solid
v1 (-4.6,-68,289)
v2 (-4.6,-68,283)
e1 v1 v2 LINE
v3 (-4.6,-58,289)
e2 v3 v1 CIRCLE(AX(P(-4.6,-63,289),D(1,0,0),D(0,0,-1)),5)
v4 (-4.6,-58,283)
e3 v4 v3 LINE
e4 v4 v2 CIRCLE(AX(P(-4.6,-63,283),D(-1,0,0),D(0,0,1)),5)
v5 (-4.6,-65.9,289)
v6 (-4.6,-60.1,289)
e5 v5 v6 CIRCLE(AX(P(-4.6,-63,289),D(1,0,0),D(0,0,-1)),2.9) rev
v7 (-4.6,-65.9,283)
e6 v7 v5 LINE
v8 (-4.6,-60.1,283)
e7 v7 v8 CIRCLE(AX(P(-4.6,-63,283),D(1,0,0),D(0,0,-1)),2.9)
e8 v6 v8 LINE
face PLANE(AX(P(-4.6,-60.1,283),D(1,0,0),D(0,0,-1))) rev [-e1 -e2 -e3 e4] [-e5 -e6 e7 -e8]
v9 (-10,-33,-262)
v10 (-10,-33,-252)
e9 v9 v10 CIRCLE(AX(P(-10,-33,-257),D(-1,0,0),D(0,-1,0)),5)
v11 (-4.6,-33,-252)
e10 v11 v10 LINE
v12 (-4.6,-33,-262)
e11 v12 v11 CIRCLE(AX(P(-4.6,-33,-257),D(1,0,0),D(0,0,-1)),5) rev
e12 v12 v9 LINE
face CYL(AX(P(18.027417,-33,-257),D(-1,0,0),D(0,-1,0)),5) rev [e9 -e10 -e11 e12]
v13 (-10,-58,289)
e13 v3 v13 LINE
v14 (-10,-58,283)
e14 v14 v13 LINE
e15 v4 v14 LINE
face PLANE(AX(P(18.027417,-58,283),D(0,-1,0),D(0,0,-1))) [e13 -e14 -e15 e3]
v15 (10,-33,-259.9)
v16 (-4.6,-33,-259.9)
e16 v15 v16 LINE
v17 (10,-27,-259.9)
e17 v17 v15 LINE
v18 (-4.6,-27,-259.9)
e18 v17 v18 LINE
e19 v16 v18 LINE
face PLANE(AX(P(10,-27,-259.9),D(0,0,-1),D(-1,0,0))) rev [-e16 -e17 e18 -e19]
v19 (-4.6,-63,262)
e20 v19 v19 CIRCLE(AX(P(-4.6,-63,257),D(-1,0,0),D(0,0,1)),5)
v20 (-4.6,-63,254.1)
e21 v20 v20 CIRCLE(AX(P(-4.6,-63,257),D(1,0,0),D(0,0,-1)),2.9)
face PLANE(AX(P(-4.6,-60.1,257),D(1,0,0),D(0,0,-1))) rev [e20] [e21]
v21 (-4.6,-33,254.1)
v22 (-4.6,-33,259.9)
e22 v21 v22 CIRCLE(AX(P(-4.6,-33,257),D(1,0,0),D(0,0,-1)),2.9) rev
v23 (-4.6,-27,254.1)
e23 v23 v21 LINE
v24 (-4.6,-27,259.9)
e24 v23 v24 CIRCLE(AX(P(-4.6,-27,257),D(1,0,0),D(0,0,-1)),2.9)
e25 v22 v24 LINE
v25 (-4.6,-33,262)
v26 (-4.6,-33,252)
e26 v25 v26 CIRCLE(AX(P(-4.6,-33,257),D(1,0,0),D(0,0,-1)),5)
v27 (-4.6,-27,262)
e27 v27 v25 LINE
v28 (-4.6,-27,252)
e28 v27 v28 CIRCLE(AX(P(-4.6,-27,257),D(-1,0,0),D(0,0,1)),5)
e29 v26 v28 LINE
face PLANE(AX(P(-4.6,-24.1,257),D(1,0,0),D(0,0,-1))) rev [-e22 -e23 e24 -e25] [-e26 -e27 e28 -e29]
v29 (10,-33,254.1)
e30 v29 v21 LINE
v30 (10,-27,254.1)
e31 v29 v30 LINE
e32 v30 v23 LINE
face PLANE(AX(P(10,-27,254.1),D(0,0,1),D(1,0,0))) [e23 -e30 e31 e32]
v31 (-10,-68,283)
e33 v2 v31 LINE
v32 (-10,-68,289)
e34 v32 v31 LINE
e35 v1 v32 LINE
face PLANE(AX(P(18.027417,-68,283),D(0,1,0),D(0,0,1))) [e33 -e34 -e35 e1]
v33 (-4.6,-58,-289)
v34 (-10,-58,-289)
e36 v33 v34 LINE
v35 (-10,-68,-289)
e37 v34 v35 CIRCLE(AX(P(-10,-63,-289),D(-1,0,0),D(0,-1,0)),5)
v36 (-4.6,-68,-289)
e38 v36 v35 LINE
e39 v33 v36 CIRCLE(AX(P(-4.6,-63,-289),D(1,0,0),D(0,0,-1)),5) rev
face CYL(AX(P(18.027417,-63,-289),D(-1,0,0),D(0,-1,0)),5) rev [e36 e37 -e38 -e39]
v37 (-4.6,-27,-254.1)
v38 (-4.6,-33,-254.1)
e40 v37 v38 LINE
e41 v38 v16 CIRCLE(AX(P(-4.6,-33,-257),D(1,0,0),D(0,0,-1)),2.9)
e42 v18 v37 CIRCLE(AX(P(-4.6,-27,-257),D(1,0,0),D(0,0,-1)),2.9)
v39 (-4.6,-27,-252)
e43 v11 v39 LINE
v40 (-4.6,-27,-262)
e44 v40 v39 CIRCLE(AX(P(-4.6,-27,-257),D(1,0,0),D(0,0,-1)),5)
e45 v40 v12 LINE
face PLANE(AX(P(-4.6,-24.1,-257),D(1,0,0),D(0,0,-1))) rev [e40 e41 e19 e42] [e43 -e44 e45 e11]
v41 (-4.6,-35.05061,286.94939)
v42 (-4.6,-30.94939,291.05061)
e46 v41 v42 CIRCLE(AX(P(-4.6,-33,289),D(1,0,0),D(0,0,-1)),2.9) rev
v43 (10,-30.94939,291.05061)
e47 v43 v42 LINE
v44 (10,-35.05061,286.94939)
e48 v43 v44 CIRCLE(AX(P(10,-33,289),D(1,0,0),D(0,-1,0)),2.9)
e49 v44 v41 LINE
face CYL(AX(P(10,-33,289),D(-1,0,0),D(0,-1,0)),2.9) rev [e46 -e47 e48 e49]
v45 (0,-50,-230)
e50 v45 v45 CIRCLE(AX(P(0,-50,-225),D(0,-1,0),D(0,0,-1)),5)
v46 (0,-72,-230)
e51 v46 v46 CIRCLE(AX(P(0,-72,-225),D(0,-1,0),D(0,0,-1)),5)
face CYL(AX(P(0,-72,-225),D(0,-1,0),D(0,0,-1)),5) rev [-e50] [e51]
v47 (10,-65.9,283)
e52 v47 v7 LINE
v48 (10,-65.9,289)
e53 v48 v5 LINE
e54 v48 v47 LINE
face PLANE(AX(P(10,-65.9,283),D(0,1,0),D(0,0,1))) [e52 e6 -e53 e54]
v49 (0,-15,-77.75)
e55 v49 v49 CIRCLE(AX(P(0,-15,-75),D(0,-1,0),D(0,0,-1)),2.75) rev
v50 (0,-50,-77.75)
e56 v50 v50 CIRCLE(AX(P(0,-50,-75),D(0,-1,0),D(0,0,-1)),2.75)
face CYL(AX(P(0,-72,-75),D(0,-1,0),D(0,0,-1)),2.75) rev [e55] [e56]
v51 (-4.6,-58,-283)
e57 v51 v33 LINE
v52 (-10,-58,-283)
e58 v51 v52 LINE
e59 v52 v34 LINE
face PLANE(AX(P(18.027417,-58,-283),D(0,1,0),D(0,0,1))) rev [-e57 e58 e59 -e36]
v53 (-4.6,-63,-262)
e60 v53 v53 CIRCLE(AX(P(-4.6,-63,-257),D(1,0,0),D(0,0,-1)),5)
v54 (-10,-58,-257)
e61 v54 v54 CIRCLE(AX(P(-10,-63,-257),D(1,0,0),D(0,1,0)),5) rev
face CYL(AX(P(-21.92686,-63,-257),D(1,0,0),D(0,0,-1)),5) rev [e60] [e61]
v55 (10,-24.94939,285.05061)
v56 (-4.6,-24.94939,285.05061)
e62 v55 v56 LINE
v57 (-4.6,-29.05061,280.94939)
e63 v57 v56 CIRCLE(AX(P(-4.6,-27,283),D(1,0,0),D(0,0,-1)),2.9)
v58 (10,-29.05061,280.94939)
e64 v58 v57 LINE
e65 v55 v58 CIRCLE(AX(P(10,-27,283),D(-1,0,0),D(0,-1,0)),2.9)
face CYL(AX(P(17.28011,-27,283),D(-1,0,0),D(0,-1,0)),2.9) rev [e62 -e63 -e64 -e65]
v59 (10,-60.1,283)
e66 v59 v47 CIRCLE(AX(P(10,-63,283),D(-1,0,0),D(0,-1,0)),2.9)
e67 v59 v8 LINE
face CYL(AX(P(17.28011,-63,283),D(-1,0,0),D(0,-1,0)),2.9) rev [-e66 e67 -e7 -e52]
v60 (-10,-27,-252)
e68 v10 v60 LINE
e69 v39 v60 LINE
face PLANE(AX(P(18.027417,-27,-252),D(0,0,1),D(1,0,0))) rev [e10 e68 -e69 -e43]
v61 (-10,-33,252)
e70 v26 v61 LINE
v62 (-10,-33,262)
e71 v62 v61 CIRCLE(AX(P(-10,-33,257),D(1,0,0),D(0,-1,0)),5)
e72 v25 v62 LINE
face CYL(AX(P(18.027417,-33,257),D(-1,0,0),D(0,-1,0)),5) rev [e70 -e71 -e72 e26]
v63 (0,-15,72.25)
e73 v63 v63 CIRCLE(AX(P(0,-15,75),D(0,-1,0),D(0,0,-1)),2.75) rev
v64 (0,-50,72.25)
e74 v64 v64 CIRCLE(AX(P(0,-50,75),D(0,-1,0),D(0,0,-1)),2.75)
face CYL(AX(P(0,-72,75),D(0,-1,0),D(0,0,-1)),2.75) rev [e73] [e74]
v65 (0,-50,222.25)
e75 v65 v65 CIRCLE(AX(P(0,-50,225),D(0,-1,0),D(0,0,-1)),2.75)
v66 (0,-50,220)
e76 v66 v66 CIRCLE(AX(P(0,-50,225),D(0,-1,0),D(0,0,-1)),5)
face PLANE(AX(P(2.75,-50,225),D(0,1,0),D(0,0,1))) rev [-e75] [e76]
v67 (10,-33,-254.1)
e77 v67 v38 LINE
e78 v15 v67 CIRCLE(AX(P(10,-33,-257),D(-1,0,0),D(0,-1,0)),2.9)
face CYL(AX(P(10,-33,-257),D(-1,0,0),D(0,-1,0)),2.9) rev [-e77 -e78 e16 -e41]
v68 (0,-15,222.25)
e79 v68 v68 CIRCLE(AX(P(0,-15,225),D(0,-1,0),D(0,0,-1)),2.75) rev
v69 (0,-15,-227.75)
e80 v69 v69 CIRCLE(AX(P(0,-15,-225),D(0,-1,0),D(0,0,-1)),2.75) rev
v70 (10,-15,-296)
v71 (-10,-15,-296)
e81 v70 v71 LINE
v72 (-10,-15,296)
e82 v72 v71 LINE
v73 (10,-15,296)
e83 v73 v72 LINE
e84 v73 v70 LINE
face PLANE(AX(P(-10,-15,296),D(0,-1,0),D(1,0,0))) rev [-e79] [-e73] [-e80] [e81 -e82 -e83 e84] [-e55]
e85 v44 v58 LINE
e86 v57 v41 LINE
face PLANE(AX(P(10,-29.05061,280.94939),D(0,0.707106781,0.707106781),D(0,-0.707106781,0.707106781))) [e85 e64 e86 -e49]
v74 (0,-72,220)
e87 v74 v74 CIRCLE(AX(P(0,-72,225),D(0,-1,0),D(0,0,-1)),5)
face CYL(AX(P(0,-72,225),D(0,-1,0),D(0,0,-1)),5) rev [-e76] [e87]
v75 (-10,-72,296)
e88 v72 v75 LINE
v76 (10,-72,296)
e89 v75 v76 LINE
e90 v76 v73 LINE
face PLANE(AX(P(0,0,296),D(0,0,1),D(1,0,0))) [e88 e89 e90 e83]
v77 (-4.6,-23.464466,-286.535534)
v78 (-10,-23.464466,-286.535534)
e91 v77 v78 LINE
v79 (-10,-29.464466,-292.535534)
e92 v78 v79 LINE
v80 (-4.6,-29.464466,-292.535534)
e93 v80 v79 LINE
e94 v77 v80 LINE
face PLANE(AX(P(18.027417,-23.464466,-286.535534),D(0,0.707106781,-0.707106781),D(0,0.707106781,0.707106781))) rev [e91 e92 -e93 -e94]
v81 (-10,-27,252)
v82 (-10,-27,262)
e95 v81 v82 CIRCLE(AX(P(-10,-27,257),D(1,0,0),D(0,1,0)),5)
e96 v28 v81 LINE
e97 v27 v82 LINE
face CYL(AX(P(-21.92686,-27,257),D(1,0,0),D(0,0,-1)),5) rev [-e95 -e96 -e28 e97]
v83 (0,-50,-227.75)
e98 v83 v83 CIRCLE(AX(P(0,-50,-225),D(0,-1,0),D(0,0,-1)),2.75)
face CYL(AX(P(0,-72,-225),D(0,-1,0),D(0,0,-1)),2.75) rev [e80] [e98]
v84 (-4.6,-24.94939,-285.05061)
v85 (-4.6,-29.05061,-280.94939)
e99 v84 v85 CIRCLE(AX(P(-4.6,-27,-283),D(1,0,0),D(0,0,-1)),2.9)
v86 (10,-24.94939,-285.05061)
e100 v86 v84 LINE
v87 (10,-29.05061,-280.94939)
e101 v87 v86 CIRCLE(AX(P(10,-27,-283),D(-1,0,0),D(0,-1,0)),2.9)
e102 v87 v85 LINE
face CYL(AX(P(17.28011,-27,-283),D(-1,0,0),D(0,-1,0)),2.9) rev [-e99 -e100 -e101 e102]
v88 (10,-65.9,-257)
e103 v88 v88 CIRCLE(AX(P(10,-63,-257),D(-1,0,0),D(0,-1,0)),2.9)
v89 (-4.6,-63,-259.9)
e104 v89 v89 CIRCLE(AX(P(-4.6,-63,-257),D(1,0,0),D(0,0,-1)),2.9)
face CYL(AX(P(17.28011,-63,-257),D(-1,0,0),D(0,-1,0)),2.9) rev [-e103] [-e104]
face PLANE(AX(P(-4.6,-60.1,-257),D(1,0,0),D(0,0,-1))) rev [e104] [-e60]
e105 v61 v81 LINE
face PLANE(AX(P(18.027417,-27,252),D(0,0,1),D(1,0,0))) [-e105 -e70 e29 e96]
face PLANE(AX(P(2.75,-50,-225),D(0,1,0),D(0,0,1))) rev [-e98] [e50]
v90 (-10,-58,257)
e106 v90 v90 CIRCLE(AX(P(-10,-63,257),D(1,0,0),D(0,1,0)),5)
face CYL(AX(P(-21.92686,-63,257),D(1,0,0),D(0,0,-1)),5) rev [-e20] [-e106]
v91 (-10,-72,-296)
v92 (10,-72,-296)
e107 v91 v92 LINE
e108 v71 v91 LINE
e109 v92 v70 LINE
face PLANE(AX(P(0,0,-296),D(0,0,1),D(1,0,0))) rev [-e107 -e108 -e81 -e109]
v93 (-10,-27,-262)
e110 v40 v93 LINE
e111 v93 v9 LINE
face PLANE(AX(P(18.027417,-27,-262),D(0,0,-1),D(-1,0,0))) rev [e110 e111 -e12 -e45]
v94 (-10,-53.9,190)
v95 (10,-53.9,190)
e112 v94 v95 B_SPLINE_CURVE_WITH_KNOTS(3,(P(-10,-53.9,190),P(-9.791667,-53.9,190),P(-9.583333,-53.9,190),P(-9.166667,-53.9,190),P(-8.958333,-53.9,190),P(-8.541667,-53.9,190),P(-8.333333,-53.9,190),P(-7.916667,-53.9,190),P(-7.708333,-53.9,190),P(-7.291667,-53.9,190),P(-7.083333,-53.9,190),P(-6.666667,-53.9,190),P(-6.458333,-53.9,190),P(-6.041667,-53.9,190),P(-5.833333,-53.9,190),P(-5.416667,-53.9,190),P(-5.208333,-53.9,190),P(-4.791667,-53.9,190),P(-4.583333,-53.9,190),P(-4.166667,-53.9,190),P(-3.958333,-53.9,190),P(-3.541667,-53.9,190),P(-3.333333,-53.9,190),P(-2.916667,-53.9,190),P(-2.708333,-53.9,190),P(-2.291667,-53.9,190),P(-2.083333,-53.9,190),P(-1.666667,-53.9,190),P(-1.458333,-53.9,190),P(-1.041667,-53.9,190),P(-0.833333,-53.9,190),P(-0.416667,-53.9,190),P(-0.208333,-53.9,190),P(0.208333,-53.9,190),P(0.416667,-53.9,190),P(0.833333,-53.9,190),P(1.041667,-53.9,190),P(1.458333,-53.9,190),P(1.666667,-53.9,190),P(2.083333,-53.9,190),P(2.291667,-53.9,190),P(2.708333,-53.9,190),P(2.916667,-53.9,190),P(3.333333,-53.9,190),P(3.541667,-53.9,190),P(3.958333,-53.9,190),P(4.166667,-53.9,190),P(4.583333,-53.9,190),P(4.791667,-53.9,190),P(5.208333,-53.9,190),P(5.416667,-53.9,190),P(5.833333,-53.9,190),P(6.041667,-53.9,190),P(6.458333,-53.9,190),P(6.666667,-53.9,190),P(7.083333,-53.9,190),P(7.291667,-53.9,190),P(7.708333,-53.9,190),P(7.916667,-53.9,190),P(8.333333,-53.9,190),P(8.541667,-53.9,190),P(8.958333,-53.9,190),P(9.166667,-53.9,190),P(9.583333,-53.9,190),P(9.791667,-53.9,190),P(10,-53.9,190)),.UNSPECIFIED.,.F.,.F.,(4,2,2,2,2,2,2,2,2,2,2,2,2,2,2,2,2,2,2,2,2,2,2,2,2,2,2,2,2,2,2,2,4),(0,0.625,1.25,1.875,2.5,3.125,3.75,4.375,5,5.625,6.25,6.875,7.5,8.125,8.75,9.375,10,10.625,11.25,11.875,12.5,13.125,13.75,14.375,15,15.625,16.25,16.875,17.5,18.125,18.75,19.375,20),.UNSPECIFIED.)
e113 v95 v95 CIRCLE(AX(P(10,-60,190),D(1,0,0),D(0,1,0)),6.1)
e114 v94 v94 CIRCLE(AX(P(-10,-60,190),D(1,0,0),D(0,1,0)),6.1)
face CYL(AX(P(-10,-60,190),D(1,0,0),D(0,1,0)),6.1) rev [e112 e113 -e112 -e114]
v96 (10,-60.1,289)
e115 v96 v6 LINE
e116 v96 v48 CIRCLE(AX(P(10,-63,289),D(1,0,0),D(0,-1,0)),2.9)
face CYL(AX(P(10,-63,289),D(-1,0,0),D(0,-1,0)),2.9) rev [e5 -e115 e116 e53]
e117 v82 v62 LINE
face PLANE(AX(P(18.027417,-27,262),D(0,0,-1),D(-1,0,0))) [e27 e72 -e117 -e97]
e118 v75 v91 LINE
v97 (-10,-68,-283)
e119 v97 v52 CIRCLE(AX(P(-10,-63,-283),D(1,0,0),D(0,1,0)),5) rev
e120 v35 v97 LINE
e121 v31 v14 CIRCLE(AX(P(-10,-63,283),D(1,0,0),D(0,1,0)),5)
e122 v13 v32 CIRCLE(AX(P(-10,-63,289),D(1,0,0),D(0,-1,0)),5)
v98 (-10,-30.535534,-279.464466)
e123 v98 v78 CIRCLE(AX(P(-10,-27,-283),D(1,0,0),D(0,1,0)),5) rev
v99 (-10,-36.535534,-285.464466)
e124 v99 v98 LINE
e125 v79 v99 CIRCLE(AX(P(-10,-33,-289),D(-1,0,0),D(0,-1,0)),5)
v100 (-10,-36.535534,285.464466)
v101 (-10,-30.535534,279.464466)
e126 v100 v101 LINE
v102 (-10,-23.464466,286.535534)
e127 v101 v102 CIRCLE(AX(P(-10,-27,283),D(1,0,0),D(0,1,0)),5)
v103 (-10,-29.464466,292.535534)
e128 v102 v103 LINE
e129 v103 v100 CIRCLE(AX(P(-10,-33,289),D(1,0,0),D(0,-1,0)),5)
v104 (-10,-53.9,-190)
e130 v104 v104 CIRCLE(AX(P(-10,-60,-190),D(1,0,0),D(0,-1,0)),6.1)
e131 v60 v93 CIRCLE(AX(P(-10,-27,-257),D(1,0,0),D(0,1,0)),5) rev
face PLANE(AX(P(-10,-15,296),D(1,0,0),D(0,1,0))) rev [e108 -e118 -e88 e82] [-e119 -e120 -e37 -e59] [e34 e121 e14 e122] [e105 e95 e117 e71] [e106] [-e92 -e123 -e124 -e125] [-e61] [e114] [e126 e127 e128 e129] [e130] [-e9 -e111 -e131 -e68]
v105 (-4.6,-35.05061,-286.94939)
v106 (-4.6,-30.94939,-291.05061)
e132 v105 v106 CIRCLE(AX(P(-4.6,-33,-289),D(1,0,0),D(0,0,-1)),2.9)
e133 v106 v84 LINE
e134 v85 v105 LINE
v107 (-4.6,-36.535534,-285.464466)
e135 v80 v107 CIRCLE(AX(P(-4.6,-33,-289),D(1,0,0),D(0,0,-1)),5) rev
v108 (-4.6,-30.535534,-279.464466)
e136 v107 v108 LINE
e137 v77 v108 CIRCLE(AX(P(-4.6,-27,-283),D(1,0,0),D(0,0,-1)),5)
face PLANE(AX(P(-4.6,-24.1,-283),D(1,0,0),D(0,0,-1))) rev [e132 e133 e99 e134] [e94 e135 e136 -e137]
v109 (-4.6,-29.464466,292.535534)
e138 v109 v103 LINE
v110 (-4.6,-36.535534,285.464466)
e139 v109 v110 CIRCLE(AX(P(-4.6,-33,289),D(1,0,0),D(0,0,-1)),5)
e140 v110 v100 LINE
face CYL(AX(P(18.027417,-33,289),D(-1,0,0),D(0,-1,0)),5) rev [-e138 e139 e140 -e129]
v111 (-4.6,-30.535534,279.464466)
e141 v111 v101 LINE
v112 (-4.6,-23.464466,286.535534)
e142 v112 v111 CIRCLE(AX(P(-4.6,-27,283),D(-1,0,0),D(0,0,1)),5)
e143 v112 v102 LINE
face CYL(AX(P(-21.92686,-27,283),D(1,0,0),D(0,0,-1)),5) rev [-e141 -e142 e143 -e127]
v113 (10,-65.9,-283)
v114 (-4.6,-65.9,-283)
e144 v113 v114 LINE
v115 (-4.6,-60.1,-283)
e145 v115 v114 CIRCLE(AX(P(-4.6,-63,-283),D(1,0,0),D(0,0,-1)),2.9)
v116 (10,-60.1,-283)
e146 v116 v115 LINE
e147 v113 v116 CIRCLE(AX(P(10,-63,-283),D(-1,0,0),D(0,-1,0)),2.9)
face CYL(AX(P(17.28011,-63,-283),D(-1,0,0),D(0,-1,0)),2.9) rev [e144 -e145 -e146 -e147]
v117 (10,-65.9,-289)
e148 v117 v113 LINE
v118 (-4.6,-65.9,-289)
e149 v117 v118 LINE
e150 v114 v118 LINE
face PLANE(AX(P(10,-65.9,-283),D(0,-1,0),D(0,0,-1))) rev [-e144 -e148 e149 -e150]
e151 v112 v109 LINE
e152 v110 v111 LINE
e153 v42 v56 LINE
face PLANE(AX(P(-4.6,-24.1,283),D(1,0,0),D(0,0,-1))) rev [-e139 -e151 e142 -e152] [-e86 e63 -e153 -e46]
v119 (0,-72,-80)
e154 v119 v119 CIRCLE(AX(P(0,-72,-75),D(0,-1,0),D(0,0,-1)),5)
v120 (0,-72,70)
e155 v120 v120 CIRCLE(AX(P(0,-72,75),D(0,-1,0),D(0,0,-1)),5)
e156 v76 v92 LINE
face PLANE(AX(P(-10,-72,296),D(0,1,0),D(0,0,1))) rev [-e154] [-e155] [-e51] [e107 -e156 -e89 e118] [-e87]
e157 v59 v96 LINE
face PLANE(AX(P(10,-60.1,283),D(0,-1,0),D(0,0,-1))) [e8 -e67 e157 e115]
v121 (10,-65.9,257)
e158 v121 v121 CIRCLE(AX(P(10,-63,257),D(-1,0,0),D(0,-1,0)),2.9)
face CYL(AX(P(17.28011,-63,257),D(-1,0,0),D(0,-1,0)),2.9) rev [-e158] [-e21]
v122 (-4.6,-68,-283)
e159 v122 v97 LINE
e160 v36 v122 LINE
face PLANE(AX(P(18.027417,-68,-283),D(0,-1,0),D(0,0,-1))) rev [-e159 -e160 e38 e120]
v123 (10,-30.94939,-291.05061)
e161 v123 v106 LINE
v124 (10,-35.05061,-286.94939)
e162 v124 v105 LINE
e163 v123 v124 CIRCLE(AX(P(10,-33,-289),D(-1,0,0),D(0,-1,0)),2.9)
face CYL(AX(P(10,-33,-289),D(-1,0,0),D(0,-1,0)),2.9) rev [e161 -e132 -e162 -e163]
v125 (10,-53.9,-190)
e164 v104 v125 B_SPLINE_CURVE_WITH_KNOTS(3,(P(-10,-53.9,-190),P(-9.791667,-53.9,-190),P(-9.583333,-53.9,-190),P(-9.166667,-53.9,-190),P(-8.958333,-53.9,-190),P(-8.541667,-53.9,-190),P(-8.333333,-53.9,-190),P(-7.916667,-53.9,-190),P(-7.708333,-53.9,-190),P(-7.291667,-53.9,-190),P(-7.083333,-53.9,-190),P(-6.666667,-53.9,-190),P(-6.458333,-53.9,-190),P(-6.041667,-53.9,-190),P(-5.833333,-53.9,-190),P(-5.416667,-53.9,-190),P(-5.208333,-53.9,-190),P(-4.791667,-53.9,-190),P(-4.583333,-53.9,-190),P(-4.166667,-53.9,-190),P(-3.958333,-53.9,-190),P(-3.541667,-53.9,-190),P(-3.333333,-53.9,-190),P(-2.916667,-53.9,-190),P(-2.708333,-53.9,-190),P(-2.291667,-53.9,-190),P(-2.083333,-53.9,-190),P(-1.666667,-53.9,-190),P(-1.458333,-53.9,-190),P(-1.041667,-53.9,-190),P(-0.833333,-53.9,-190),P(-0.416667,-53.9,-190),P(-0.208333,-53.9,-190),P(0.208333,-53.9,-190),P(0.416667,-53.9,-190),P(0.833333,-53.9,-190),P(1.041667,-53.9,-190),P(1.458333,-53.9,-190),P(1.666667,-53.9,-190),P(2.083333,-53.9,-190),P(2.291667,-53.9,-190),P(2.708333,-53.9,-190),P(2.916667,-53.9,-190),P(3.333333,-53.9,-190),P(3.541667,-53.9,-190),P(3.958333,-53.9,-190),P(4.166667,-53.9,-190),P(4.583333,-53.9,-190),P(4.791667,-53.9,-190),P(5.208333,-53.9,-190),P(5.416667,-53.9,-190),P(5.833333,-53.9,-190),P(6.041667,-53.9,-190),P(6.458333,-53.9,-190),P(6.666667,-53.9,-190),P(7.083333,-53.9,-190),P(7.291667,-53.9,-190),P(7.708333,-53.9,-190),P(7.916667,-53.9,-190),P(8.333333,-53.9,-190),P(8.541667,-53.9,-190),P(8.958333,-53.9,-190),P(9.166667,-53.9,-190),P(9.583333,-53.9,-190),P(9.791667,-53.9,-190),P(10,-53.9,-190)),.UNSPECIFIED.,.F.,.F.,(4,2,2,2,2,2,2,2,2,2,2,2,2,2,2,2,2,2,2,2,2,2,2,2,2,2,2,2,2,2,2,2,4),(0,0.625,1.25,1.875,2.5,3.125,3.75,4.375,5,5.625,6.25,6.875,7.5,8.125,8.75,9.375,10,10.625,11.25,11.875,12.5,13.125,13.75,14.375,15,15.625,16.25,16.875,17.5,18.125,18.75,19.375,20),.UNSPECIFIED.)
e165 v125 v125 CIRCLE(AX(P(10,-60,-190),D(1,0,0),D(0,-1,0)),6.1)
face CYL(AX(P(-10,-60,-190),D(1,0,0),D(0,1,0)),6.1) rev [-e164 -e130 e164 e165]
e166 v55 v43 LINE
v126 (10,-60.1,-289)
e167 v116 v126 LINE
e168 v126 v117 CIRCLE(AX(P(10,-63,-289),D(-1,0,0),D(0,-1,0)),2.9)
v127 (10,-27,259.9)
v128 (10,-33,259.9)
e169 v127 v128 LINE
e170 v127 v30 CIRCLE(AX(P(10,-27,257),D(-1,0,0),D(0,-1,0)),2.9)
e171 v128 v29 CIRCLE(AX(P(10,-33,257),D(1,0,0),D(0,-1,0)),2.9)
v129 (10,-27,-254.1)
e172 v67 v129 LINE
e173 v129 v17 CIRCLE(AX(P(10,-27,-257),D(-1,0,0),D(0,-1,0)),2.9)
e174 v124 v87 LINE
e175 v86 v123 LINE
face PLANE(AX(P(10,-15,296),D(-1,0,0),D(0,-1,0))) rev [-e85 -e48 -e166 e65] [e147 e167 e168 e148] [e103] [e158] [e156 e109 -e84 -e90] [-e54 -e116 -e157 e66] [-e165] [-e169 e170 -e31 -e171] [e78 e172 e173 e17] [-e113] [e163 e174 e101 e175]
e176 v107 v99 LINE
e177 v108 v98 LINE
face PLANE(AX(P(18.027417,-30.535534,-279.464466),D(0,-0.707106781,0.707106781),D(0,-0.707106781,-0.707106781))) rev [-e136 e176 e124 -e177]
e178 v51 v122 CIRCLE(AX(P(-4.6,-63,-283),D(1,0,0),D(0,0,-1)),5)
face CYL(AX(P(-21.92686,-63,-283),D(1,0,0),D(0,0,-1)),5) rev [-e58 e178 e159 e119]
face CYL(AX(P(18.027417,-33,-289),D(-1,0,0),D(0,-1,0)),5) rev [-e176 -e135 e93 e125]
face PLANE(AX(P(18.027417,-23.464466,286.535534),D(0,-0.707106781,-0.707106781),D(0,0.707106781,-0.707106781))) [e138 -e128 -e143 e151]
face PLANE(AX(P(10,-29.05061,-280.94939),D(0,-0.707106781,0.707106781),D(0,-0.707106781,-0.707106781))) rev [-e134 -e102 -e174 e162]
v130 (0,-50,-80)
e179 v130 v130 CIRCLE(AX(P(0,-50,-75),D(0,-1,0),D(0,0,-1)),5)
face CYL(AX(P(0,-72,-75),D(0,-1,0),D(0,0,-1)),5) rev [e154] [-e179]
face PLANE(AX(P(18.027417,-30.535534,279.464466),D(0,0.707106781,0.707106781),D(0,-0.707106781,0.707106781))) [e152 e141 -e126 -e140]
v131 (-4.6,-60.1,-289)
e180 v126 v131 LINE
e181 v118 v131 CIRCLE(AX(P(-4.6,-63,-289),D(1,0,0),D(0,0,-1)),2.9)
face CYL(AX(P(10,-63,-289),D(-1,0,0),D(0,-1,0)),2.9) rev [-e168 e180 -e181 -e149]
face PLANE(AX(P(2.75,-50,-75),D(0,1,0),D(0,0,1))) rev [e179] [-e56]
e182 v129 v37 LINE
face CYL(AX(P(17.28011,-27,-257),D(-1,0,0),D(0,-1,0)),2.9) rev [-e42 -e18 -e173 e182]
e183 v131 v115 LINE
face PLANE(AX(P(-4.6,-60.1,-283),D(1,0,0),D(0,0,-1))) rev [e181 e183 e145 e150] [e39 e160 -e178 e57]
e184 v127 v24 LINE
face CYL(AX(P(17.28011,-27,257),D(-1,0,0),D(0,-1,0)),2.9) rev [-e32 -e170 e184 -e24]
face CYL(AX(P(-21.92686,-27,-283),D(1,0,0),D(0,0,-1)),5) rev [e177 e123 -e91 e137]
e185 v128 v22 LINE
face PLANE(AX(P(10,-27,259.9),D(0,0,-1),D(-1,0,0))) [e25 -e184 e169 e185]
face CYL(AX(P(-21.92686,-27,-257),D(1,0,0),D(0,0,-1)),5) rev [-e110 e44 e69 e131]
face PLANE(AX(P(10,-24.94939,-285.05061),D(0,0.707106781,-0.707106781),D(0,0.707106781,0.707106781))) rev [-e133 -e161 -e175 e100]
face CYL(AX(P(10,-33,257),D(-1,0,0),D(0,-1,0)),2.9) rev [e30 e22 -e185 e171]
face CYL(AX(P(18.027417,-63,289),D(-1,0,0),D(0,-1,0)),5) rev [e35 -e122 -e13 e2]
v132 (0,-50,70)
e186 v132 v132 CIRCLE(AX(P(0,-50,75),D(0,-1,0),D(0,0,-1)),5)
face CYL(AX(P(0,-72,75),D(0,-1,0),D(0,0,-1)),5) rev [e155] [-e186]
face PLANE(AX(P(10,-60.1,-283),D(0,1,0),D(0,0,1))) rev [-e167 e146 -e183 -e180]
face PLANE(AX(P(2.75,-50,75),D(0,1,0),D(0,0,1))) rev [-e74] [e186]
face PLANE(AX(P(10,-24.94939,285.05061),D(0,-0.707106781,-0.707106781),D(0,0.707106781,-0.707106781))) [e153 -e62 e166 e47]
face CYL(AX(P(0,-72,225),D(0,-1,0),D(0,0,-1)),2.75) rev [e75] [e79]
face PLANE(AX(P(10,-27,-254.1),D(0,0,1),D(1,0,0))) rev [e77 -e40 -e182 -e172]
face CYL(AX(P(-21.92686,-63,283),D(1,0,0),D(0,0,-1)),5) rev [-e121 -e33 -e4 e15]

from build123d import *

# Parameters (mm, degrees)
CUT_EXTRUDE1_START       = 5
CUT_EXTRUDE1_OUTLINE_W   = 57
CUT_EXTRUDE1_OUTLINE_H   = 592
CUT_EXTRUDE1_DEPTH       = 5
CUT_EXTRUDE1_START_2     = -10
CUT_EXTRUDE1_2_OUTLINE_W = 57
CUT_EXTRUDE1_2_OUTLINE_H = 592
CUT_EXTRUDE1_2_DEPTH     = 4.9999999
CUT_EXTRUDE1_START_3     = -4.6
CUT_EXTRUDE1_3_DEPTH     = 14.6
CUT_EXTRUDE1_START_4     = -296
CUT_EXTRUDE1_4_OUTLINE_W = 10.0000001
CUT_EXTRUDE1_4_OUTLINE_H = 57
CUT_EXTRUDE1_4_DEPTH     = 592
CUT_EXTRUDE1_START_5     = -73
CUT_EXTRUDE1_5_OUTLINE_R = 5
CUT_EXTRUDE1_5_DEPTH     = 23
CUT_EXTRUDE1_START_6     = -50
CUT_EXTRUDE1_6_OUTLINE_R = 2.75
CUT_EXTRUDE1_6_DEPTH     = 36
CUT_EXTRUDE1_START_7     = -5.0000001
CUT_EXTRUDE1_7_DEPTH     = 10.0000001
CUT_EXTRUDE1_8_DEPTH     = 0.4000001
BOSS_EXTRUDE1_START      = -5.4
BOSS_EXTRUDE1_DEPTH      = 14.6
BOSS_EXTRUDE2_START      = 5.4
BOSS_EXTRUDE2_DEPTH      = 5.4
CUT_EXTRUDE2_DEPTH       = 5.4
CUT_EXTRUDE3_DEPTH       = 306.286750449
SKETCH6_R                = 6.1
CUT_EXTRUDE4_DEPTH       = 306.286750449


with BuildPart() as part:
    # Cut-Extrude1: read off the stored shape, not the designer's step
    # Cut-Extrude1 outline → Cut-Extrude1 (new body)
    with BuildSketch(Plane.YZ.offset(CUT_EXTRUDE1_START)):
        with Locations((-43.5, 0)):
            Rectangle(CUT_EXTRUDE1_OUTLINE_W, CUT_EXTRUDE1_OUTLINE_H)
        with BuildLine():
            Line((-61.5, -285.9), (-64.5, -285.9))
            ThreePointArc((-64.5, -285.9), (-67.4, -283), (-64.5, -280.1))
            Line((-64.5, -280.1), (-61.5, -280.1))
            ThreePointArc((-61.5, -280.1), (-58.6, -283), (-61.5, -285.9))
        make_face(mode=Mode.SUBTRACT)
        with BuildLine():
            Line((-61.5, -259.9), (-64.5, -259.9))
            ThreePointArc((-64.5, -259.9), (-67.4, -257), (-64.5, -254.1))
            Line((-64.5, -254.1), (-61.5, -254.1))
            ThreePointArc((-61.5, -254.1), (-58.6, -257), (-61.5, -259.9))
        make_face(mode=Mode.SUBTRACT)
        with BuildLine():
            Line((-28.5, -280.1), (-25.5, -280.1))
            ThreePointArc((-25.5, -280.1), (-22.6, -283), (-25.5, -285.9))
            Line((-25.5, -285.9), (-28.5, -285.9))
            ThreePointArc((-28.5, -285.9), (-31.4, -283), (-28.5, -280.1))
        make_face(mode=Mode.SUBTRACT)
        with BuildLine():
            Line((-28.5, -254.1), (-25.5, -254.1))
            ThreePointArc((-25.5, -254.1), (-22.6, -257), (-25.5, -259.9))
            Line((-25.5, -259.9), (-28.5, -259.9))
            ThreePointArc((-28.5, -259.9), (-31.4, -257), (-28.5, -254.1))
        make_face(mode=Mode.SUBTRACT)
        with BuildLine():
            Line((-61.5, 254.1), (-64.5, 254.1))
            ThreePointArc((-64.5, 254.1), (-67.4, 257), (-64.5, 259.9))
            Line((-64.5, 259.9), (-61.5, 259.9))
            ThreePointArc((-61.5, 259.9), (-58.6, 257), (-61.5, 254.1))
        make_face(mode=Mode.SUBTRACT)
        with BuildLine():
            Line((-61.5, 280.1), (-64.5, 280.1))
            ThreePointArc((-64.5, 280.1), (-67.4, 283), (-64.5, 285.9))
            Line((-64.5, 285.9), (-61.5, 285.9))
            ThreePointArc((-61.5, 285.9), (-58.6, 283), (-61.5, 280.1))
        make_face(mode=Mode.SUBTRACT)
        with BuildLine():
            Line((-28.5, 259.9), (-25.5, 259.9))
            ThreePointArc((-25.5, 259.9), (-22.6, 257), (-25.5, 254.1))
            Line((-25.5, 254.1), (-28.5, 254.1))
            ThreePointArc((-28.5, 254.1), (-31.4, 257), (-28.5, 259.9))
        make_face(mode=Mode.SUBTRACT)
        with BuildLine():
            Line((-28.5, 285.9), (-25.5, 285.9))
            ThreePointArc((-25.5, 285.9), (-22.6, 283), (-25.5, 280.1))
            Line((-25.5, 280.1), (-28.5, 280.1))
            ThreePointArc((-28.5, 280.1), (-31.4, 283), (-28.5, 285.9))
        make_face(mode=Mode.SUBTRACT)
    extrude(amount=CUT_EXTRUDE1_DEPTH)

    # Cut-Extrude1 3 outline → Cut-Extrude1 3 (add)
    # profile 1 of 8: a face of its own
    with BuildSketch(Plane.YZ.offset(CUT_EXTRUDE1_START_3)):
        with BuildLine():
            Line((-25.5, 288), (-28.5, 288))
            ThreePointArc((-28.5, 288), (-33.5, 283), (-28.5, 278))
            Line((-28.5, 278), (-25.5, 278))
            ThreePointArc((-25.5, 278), (-20.5, 283), (-25.5, 288))
        make_face()
        with BuildLine():
            Line((-28.5, 285.9), (-25.5, 285.9))
            ThreePointArc((-25.5, 285.9), (-22.6, 283), (-25.5, 280.1))
            Line((-25.5, 280.1), (-28.5, 280.1))
            ThreePointArc((-28.5, 280.1), (-31.4, 283), (-28.5, 285.9))
        make_face(mode=Mode.SUBTRACT)
    # profile 2 of 8: a face of its own
    with BuildSketch(Plane.YZ.offset(CUT_EXTRUDE1_START_3)):
        with BuildLine():
            Line((-25.5, 262), (-28.5, 262))
            ThreePointArc((-28.5, 262), (-33.5, 257), (-28.5, 252))
            Line((-28.5, 252), (-25.5, 252))
            ThreePointArc((-25.5, 252), (-20.5, 257), (-25.5, 262))
        make_face()
        with BuildLine():
            Line((-28.5, 259.9), (-25.5, 259.9))
            ThreePointArc((-25.5, 259.9), (-22.6, 257), (-25.5, 254.1))
            Line((-25.5, 254.1), (-28.5, 254.1))
            ThreePointArc((-28.5, 254.1), (-31.4, 257), (-28.5, 259.9))
        make_face(mode=Mode.SUBTRACT)
    # profile 3 of 8: a face of its own
    with BuildSketch(Plane.YZ.offset(CUT_EXTRUDE1_START_3)):
        with BuildLine():
            Line((-64.5, 252), (-61.5, 252))
            ThreePointArc((-61.5, 252), (-56.5, 257), (-61.5, 262))
            Line((-61.5, 262), (-64.5, 262))
            ThreePointArc((-64.5, 262), (-69.5, 257), (-64.5, 252))
        make_face()
        with BuildLine():
            Line((-61.5, 254.1), (-64.5, 254.1))
            ThreePointArc((-64.5, 254.1), (-67.4, 257), (-64.5, 259.9))
            Line((-64.5, 259.9), (-61.5, 259.9))
            ThreePointArc((-61.5, 259.9), (-58.6, 257), (-61.5, 254.1))
        make_face(mode=Mode.SUBTRACT)
    # profile 4 of 8: a face of its own
    with BuildSketch(Plane.YZ.offset(CUT_EXTRUDE1_START_3)):
        with BuildLine():
            Line((-64.5, 278), (-61.5, 278))
            ThreePointArc((-61.5, 278), (-56.5, 283), (-61.5, 288))
            Line((-61.5, 288), (-64.5, 288))
            ThreePointArc((-64.5, 288), (-69.5, 283), (-64.5, 278))
        make_face()
        with BuildLine():
            Line((-61.5, 280.1), (-64.5, 280.1))
            ThreePointArc((-64.5, 280.1), (-67.4, 283), (-64.5, 285.9))
            Line((-64.5, 285.9), (-61.5, 285.9))
            ThreePointArc((-61.5, 285.9), (-58.6, 283), (-61.5, 280.1))
        make_face(mode=Mode.SUBTRACT)
    # profile 5 of 8: a face of its own
    with BuildSketch(Plane.YZ.offset(CUT_EXTRUDE1_START_3)):
        with BuildLine():
            Line((-64.5, -288), (-61.5, -288))
            ThreePointArc((-61.5, -288), (-56.5, -283), (-61.5, -278))
            Line((-61.5, -278), (-64.5, -278))
            ThreePointArc((-64.5, -278), (-69.5, -283), (-64.5, -288))
        make_face()
        with BuildLine():
            Line((-61.5, -285.9), (-64.5, -285.9))
            ThreePointArc((-64.5, -285.9), (-67.4, -283), (-64.5, -280.1))
            Line((-64.5, -280.1), (-61.5, -280.1))
            ThreePointArc((-61.5, -280.1), (-58.6, -283), (-61.5, -285.9))
        make_face(mode=Mode.SUBTRACT)
    # profile 6 of 8: a face of its own
    with BuildSketch(Plane.YZ.offset(CUT_EXTRUDE1_START_3)):
        with BuildLine():
            Line((-64.5, -262), (-61.5, -262))
            ThreePointArc((-61.5, -262), (-56.5, -257), (-61.5, -252))
            Line((-61.5, -252), (-64.5, -252))
            ThreePointArc((-64.5, -252), (-69.5, -257), (-64.5, -262))
        make_face()
        with BuildLine():
            Line((-61.5, -259.9), (-64.5, -259.9))
            ThreePointArc((-64.5, -259.9), (-67.4, -257), (-64.5, -254.1))
            Line((-64.5, -254.1), (-61.5, -254.1))
            ThreePointArc((-61.5, -254.1), (-58.6, -257), (-61.5, -259.9))
        make_face(mode=Mode.SUBTRACT)
    # profile 7 of 8: a face of its own
    with BuildSketch(Plane.YZ.offset(CUT_EXTRUDE1_START_3)):
        with BuildLine():
            Line((-25.5, -252), (-28.5, -252))
            ThreePointArc((-28.5, -252), (-33.5, -257), (-28.5, -262))
            Line((-28.5, -262), (-25.5, -262))
            ThreePointArc((-25.5, -262), (-20.5, -257), (-25.5, -252))
        make_face()
        with BuildLine():
            Line((-28.5, -254.1), (-25.5, -254.1))
            ThreePointArc((-25.5, -254.1), (-22.6, -257), (-25.5, -259.9))
            Line((-25.5, -259.9), (-28.5, -259.9))
            ThreePointArc((-28.5, -259.9), (-31.4, -257), (-28.5, -254.1))
        make_face(mode=Mode.SUBTRACT)
    # profile 8 of 8: a face of its own
    with BuildSketch(Plane.YZ.offset(CUT_EXTRUDE1_START_3)):
        with BuildLine():
            Line((-25.5, -278), (-28.5, -278))
            ThreePointArc((-28.5, -278), (-33.5, -283), (-28.5, -288))
            Line((-28.5, -288), (-25.5, -288))
            ThreePointArc((-25.5, -288), (-20.5, -283), (-25.5, -278))
        make_face()
        with BuildLine():
            Line((-28.5, -280.1), (-25.5, -280.1))
            ThreePointArc((-25.5, -280.1), (-22.6, -283), (-25.5, -285.9))
            Line((-25.5, -285.9), (-28.5, -285.9))
            ThreePointArc((-28.5, -285.9), (-31.4, -283), (-28.5, -280.1))
        make_face(mode=Mode.SUBTRACT)
    extrude(amount=CUT_EXTRUDE1_3_DEPTH)



with BuildPart() as body_2:
    # Cut-Extrude1 2 outline → Cut-Extrude1 2 (new body)
    with BuildSketch(Plane.YZ.offset(CUT_EXTRUDE1_START_2)):
        with Locations((-43.5, 0)):
            Rectangle(CUT_EXTRUDE1_2_OUTLINE_W, CUT_EXTRUDE1_2_OUTLINE_H)
        with BuildLine():
            ThreePointArc((-61.5, -278), (-56.5, -283), (-61.5, -288))
            Line((-61.5, -288), (-64.5, -288))
            ThreePointArc((-64.5, -288), (-69.5, -283), (-64.5, -278))
            Line((-64.5, -278), (-61.5, -278))
        make_face(mode=Mode.SUBTRACT)
        with BuildLine():
            ThreePointArc((-61.5, -252), (-56.5, -257), (-61.5, -262))
            Line((-61.5, -262), (-64.5, -262))
            ThreePointArc((-64.5, -262), (-69.5, -257), (-64.5, -252))
            Line((-64.5, -252), (-61.5, -252))
        make_face(mode=Mode.SUBTRACT)
        with BuildLine():
            ThreePointArc((-28.5, -288), (-33.5, -283), (-28.5, -278))
            Line((-28.5, -278), (-25.5, -278))
            ThreePointArc((-25.5, -278), (-20.5, -283), (-25.5, -288))
            Line((-25.5, -288), (-28.5, -288))
        make_face(mode=Mode.SUBTRACT)
        with BuildLine():
            ThreePointArc((-28.5, -262), (-33.5, -257), (-28.5, -252))
            Line((-28.5, -252), (-25.5, -252))
            ThreePointArc((-25.5, -252), (-20.5, -257), (-25.5, -262))
            Line((-25.5, -262), (-28.5, -262))
        make_face(mode=Mode.SUBTRACT)
        with BuildLine():
            ThreePointArc((-61.5, 262), (-56.5, 257), (-61.5, 252))
            Line((-61.5, 252), (-64.5, 252))
            ThreePointArc((-64.5, 252), (-69.5, 257), (-64.5, 262))
            Line((-64.5, 262), (-61.5, 262))
        make_face(mode=Mode.SUBTRACT)
        with BuildLine():
            ThreePointArc((-61.5, 288), (-56.5, 283), (-61.5, 278))
            Line((-61.5, 278), (-64.5, 278))
            ThreePointArc((-64.5, 278), (-69.5, 283), (-64.5, 288))
            Line((-64.5, 288), (-61.5, 288))
        make_face(mode=Mode.SUBTRACT)
        with BuildLine():
            ThreePointArc((-28.5, 252), (-33.5, 257), (-28.5, 262))
            Line((-28.5, 262), (-25.5, 262))
            ThreePointArc((-25.5, 262), (-20.5, 257), (-25.5, 252))
            Line((-25.5, 252), (-28.5, 252))
        make_face(mode=Mode.SUBTRACT)
        with BuildLine():
            ThreePointArc((-28.5, 278), (-33.5, 283), (-28.5, 288))
            Line((-28.5, 288), (-25.5, 288))
            ThreePointArc((-25.5, 288), (-20.5, 283), (-25.5, 278))
            Line((-25.5, 278), (-28.5, 278))
        make_face(mode=Mode.SUBTRACT)
    extrude(amount=CUT_EXTRUDE1_2_DEPTH)


with BuildPart() as part_1:
    add(part.part)

    add(body_2.part)  # Cut-Extrude1 4 merges body 2
    # Cut-Extrude1 4 outline → Cut-Extrude1 4 (add)
    with BuildSketch(Plane.XY.offset(CUT_EXTRUDE1_START_4)):
        with Locations((-5e-08, -43.5)):
            Rectangle(CUT_EXTRUDE1_4_OUTLINE_W, CUT_EXTRUDE1_4_OUTLINE_H)
    extrude(amount=CUT_EXTRUDE1_4_DEPTH)

    # Cut-Extrude1 5 outline → Cut-Extrude1 5 (cut)
    with BuildSketch(Plane(origin=(0, 0, 0), x_dir=(1, 0, 0), z_dir=(0, 1, 0)).offset(CUT_EXTRUDE1_START_5)):
        with Locations((0, -225)):
            Circle(CUT_EXTRUDE1_5_OUTLINE_R)
        with Locations((0, -75)):
            Circle(CUT_EXTRUDE1_5_OUTLINE_R)
        with Locations((0, 75)):
            Circle(CUT_EXTRUDE1_5_OUTLINE_R)
        with Locations((0, 225)):
            Circle(CUT_EXTRUDE1_5_OUTLINE_R)
    extrude(amount=CUT_EXTRUDE1_5_DEPTH, mode=Mode.SUBTRACT)

    # Cut-Extrude1 6 outline → Cut-Extrude1 6 (cut)
    with BuildSketch(Plane(origin=(0, 0, 0), x_dir=(1, 0, 0), z_dir=(0, 1, 0)).offset(CUT_EXTRUDE1_START_6)):
        with Locations((0, -225)):
            Circle(CUT_EXTRUDE1_6_OUTLINE_R)
        with Locations((0, -75)):
            Circle(CUT_EXTRUDE1_6_OUTLINE_R)
        with Locations((0, 75)):
            Circle(CUT_EXTRUDE1_6_OUTLINE_R)
        with Locations((0, 225)):
            Circle(CUT_EXTRUDE1_6_OUTLINE_R)
    extrude(amount=CUT_EXTRUDE1_6_DEPTH, mode=Mode.SUBTRACT)

    # Cut-Extrude1 7 outline → Cut-Extrude1 7 (cut)
    with BuildSketch(Plane.YZ.offset(CUT_EXTRUDE1_START_7)):
        with BuildLine():
            ThreePointArc((-25.5, 280.1), (-22.6, 283), (-25.5, 285.9))
            Line((-25.5, 285.9), (-28.5, 285.9))
            ThreePointArc((-28.5, 285.9), (-31.4, 283), (-28.5, 280.1))
            Line((-28.5, 280.1), (-25.5, 280.1))
        make_face()
        with BuildLine():
            ThreePointArc((-61.5, 280.1), (-58.6, 283), (-61.5, 285.9))
            Line((-61.5, 285.9), (-64.5, 285.9))
            ThreePointArc((-64.5, 285.9), (-67.4, 283), (-64.5, 280.1))
            Line((-64.5, 280.1), (-61.5, 280.1))
        make_face()
        with BuildLine():
            ThreePointArc((-25.5, 254.1), (-22.6, 257), (-25.5, 259.9))
            Line((-25.5, 259.9), (-28.5, 259.9))
            ThreePointArc((-28.5, 259.9), (-31.4, 257), (-28.5, 254.1))
            Line((-28.5, 254.1), (-25.5, 254.1))
        make_face()
        with BuildLine():
            ThreePointArc((-61.5, 254.1), (-58.6, 257), (-61.5, 259.9))
            Line((-61.5, 259.9), (-64.5, 259.9))
            ThreePointArc((-64.5, 259.9), (-67.4, 257), (-64.5, 254.1))
            Line((-64.5, 254.1), (-61.5, 254.1))
        make_face()
        with BuildLine():
            ThreePointArc((-64.5, -280.1), (-67.4, -283), (-64.5, -285.9))
            Line((-64.5, -285.9), (-61.5, -285.9))
            ThreePointArc((-61.5, -285.9), (-58.6, -283), (-61.5, -280.1))
            Line((-61.5, -280.1), (-64.5, -280.1))
        make_face()
        with BuildLine():
            ThreePointArc((-28.5, -280.1), (-31.4, -283), (-28.5, -285.9))
            Line((-28.5, -285.9), (-25.5, -285.9))
            ThreePointArc((-25.5, -285.9), (-22.6, -283), (-25.5, -280.1))
            Line((-25.5, -280.1), (-28.5, -280.1))
        make_face()
        with BuildLine():
            ThreePointArc((-64.5, -254.1), (-67.4, -257), (-64.5, -259.9))
            Line((-64.5, -259.9), (-61.5, -259.9))
            ThreePointArc((-61.5, -259.9), (-58.6, -257), (-61.5, -254.1))
            Line((-61.5, -254.1), (-64.5, -254.1))
        make_face()
        with BuildLine():
            ThreePointArc((-28.5, -254.1), (-31.4, -257), (-28.5, -259.9))
            Line((-28.5, -259.9), (-25.5, -259.9))
            ThreePointArc((-25.5, -259.9), (-22.6, -257), (-25.5, -254.1))
            Line((-25.5, -254.1), (-28.5, -254.1))
        make_face()
    extrude(amount=CUT_EXTRUDE1_7_DEPTH, mode=Mode.SUBTRACT)

    # Cut-Extrude1 8 outline → Cut-Extrude1 8 (cut)
    # profile 1 of 8: a face of its own
    with BuildSketch(Plane.YZ.offset(CUT_EXTRUDE1_START_7)):
        with BuildLine():
            Line((-25.5, 288), (-28.5, 288))
            ThreePointArc((-28.5, 288), (-33.5, 283), (-28.5, 278))
            Line((-28.5, 278), (-25.5, 278))
            ThreePointArc((-25.5, 278), (-20.5, 283), (-25.5, 288))
        make_face()
        with BuildLine():
            Line((-28.5, 285.9), (-25.5, 285.9))
            ThreePointArc((-25.5, 285.9), (-22.6, 283), (-25.5, 280.1))
            Line((-25.5, 280.1), (-28.5, 280.1))
            ThreePointArc((-28.5, 280.1), (-31.4, 283), (-28.5, 285.9))
        make_face(mode=Mode.SUBTRACT)
    # profile 2 of 8: a face of its own
    with BuildSketch(Plane.YZ.offset(CUT_EXTRUDE1_START_7)):
        with BuildLine():
            Line((-61.5, 288), (-64.5, 288))
            ThreePointArc((-64.5, 288), (-69.5, 283), (-64.5, 278))
            Line((-64.5, 278), (-61.5, 278))
            ThreePointArc((-61.5, 278), (-56.5, 283), (-61.5, 288))
        make_face()
        with BuildLine():
            Line((-64.5, 285.9), (-61.5, 285.9))
            ThreePointArc((-61.5, 285.9), (-58.6, 283), (-61.5, 280.1))
            Line((-61.5, 280.1), (-64.5, 280.1))
            ThreePointArc((-64.5, 280.1), (-67.4, 283), (-64.5, 285.9))
        make_face(mode=Mode.SUBTRACT)
    # profile 3 of 8: a face of its own
    with BuildSketch(Plane.YZ.offset(CUT_EXTRUDE1_START_7)):
        with BuildLine():
            Line((-25.5, 262), (-28.5, 262))
            ThreePointArc((-28.5, 262), (-33.5, 257), (-28.5, 252))
            Line((-28.5, 252), (-25.5, 252))
            ThreePointArc((-25.5, 252), (-20.5, 257), (-25.5, 262))
        make_face()
        with BuildLine():
            Line((-28.5, 259.9), (-25.5, 259.9))
            ThreePointArc((-25.5, 259.9), (-22.6, 257), (-25.5, 254.1))
            Line((-25.5, 254.1), (-28.5, 254.1))
            ThreePointArc((-28.5, 254.1), (-31.4, 257), (-28.5, 259.9))
        make_face(mode=Mode.SUBTRACT)
    # profile 4 of 8: a face of its own
    with BuildSketch(Plane.YZ.offset(CUT_EXTRUDE1_START_7)):
        with BuildLine():
            Line((-61.5, 262), (-64.5, 262))
            ThreePointArc((-64.5, 262), (-69.5, 257), (-64.5, 252))
            Line((-64.5, 252), (-61.5, 252))
            ThreePointArc((-61.5, 252), (-56.5, 257), (-61.5, 262))
        make_face()
        with BuildLine():
            Line((-64.5, 259.9), (-61.5, 259.9))
            ThreePointArc((-61.5, 259.9), (-58.6, 257), (-61.5, 254.1))
            Line((-61.5, 254.1), (-64.5, 254.1))
            ThreePointArc((-64.5, 254.1), (-67.4, 257), (-64.5, 259.9))
        make_face(mode=Mode.SUBTRACT)
    # profile 5 of 8: a face of its own
    with BuildSketch(Plane.YZ.offset(CUT_EXTRUDE1_START_7)):
        with BuildLine():
            Line((-64.5, -288), (-61.5, -288))
            ThreePointArc((-61.5, -288), (-56.5, -283), (-61.5, -278))
            Line((-61.5, -278), (-64.5, -278))
            ThreePointArc((-64.5, -278), (-69.5, -283), (-64.5, -288))
        make_face()
        with BuildLine():
            Line((-61.5, -285.9), (-64.5, -285.9))
            ThreePointArc((-64.5, -285.9), (-67.4, -283), (-64.5, -280.1))
            Line((-64.5, -280.1), (-61.5, -280.1))
            ThreePointArc((-61.5, -280.1), (-58.6, -283), (-61.5, -285.9))
        make_face(mode=Mode.SUBTRACT)
    # profile 6 of 8: a face of its own
    with BuildSketch(Plane.YZ.offset(CUT_EXTRUDE1_START_7)):
        with BuildLine():
            Line((-28.5, -288), (-25.5, -288))
            ThreePointArc((-25.5, -288), (-20.5, -283), (-25.5, -278))
            Line((-25.5, -278), (-28.5, -278))
            ThreePointArc((-28.5, -278), (-33.5, -283), (-28.5, -288))
        make_face()
        with BuildLine():
            Line((-25.5, -285.9), (-28.5, -285.9))
            ThreePointArc((-28.5, -285.9), (-31.4, -283), (-28.5, -280.1))
            Line((-28.5, -280.1), (-25.5, -280.1))
            ThreePointArc((-25.5, -280.1), (-22.6, -283), (-25.5, -285.9))
        make_face(mode=Mode.SUBTRACT)
    # profile 7 of 8: a face of its own
    with BuildSketch(Plane.YZ.offset(CUT_EXTRUDE1_START_7)):
        with BuildLine():
            Line((-64.5, -262), (-61.5, -262))
            ThreePointArc((-61.5, -262), (-56.5, -257), (-61.5, -252))
            Line((-61.5, -252), (-64.5, -252))
            ThreePointArc((-64.5, -252), (-69.5, -257), (-64.5, -262))
        make_face()
        with BuildLine():
            Line((-61.5, -259.9), (-64.5, -259.9))
            ThreePointArc((-64.5, -259.9), (-67.4, -257), (-64.5, -254.1))
            Line((-64.5, -254.1), (-61.5, -254.1))
            ThreePointArc((-61.5, -254.1), (-58.6, -257), (-61.5, -259.9))
        make_face(mode=Mode.SUBTRACT)
    # profile 8 of 8: a face of its own
    with BuildSketch(Plane.YZ.offset(CUT_EXTRUDE1_START_7)):
        with BuildLine():
            Line((-28.5, -262), (-25.5, -262))
            ThreePointArc((-25.5, -262), (-20.5, -257), (-25.5, -252))
            Line((-25.5, -252), (-28.5, -252))
            ThreePointArc((-28.5, -252), (-33.5, -257), (-28.5, -262))
        make_face()
        with BuildLine():
            Line((-25.5, -259.9), (-28.5, -259.9))
            ThreePointArc((-28.5, -259.9), (-31.4, -257), (-28.5, -254.1))
            Line((-28.5, -254.1), (-25.5, -254.1))
            ThreePointArc((-25.5, -254.1), (-22.6, -257), (-25.5, -259.9))
        make_face(mode=Mode.SUBTRACT)
    extrude(amount=CUT_EXTRUDE1_8_DEPTH, mode=Mode.SUBTRACT)

    # Sketch2 → Boss-Extrude1 (add)
    with BuildSketch(Plane.ZY.offset(10).offset(BOSS_EXTRUDE1_START)):
        with BuildLine():
            Line((259.9, -27), (259.9, -25.5))
            ThreePointArc((259.9, -25.5), (257, -22.6), (254.1, -25.5))
            Line((254.1, -25.5), (254.1, -27))
            ThreePointArc((254.1, -27), (257, -24.1), (259.9, -27))
        make_face()
        with BuildLine():
            Line((259.9, -28.5), (259.9, -27))
            ThreePointArc((259.9, -27), (257, -29.9), (254.1, -27))
            Line((254.1, -27), (254.1, -28.5))
            ThreePointArc((254.1, -28.5), (257, -31.4), (259.9, -28.5))
        make_face()
        with BuildLine():
            Line((285.9, -27), (285.9, -25.5))
            ThreePointArc((285.9, -25.5), (283, -22.6), (280.1, -25.5))
            Line((280.1, -25.5), (280.1, -27))
            ThreePointArc((280.1, -27), (283, -24.1), (285.9, -27))
        make_face()
        with BuildLine():
            Line((285.9, -28.5), (285.9, -27))
            ThreePointArc((285.9, -27), (283, -29.9), (280.1, -27))
            Line((280.1, -27), (280.1, -28.5))
            ThreePointArc((280.1, -28.5), (283, -31.4), (285.9, -28.5))
        make_face()
        with BuildLine():
            Line((259.9, -63), (259.9, -61.5))
            ThreePointArc((259.9, -61.5), (257, -58.6), (254.1, -61.5))
            Line((254.1, -61.5), (254.1, -63))
            ThreePointArc((254.1, -63), (257, -60.1), (259.9, -63))
        make_face()
        with BuildLine():
            Line((259.9, -64.5), (259.9, -63))
            ThreePointArc((259.9, -63), (257, -65.9), (254.1, -63))
            Line((254.1, -63), (254.1, -64.5))
            ThreePointArc((254.1, -64.5), (257, -67.4), (259.9, -64.5))
        make_face()
        with BuildLine():
            Line((285.9, -63), (285.9, -61.5))
            ThreePointArc((285.9, -61.5), (283, -58.6), (280.1, -61.5))
            Line((280.1, -61.5), (280.1, -63))
            ThreePointArc((280.1, -63), (283, -60.1), (285.9, -63))
        make_face()
        with BuildLine():
            Line((285.9, -64.5), (285.9, -63))
            ThreePointArc((285.9, -63), (283, -65.9), (280.1, -63))
            Line((280.1, -63), (280.1, -64.5))
            ThreePointArc((280.1, -64.5), (283, -67.4), (285.9, -64.5))
        make_face()
    boss_extrude1 = extrude(amount=-BOSS_EXTRUDE1_DEPTH)

    # Sketch3 → Boss-Extrude2 (add)
    with BuildSketch(Plane.ZY.offset(4.6).offset(BOSS_EXTRUDE2_START)):
        with BuildLine():
            ThreePointArc((288, -25.5), (283, -20.5), (278, -25.5))
            Line((278, -25.5), (278, -27))
            ThreePointArc((278, -27), (283, -22), (288, -27))
            Line((288, -27), (288, -25.5))
        make_face()
        with BuildLine():
            ThreePointArc((262, -25.5), (257, -20.5), (252, -25.5))
            Line((252, -25.5), (252, -27))
            ThreePointArc((252, -27), (257, -22), (262, -27))
            Line((262, -27), (262, -25.5))
        make_face()
        with BuildLine():
            ThreePointArc((288, -61.5), (283, -56.5), (278, -61.5))
            Line((278, -61.5), (278, -63))
            ThreePointArc((278, -63), (283, -58), (288, -63))
            Line((288, -63), (288, -61.5))
        make_face()
        with BuildLine():
            ThreePointArc((262, -61.5), (257, -56.5), (252, -61.5))
            Line((252, -61.5), (252, -63))
            ThreePointArc((252, -63), (257, -58), (262, -63))
            Line((262, -63), (262, -61.5))
        make_face()
        with BuildLine():
            ThreePointArc((288, -27), (283, -32), (278, -27))
            Line((278, -27), (278, -28.5))
            ThreePointArc((278, -28.5), (283, -33.5), (288, -28.5))
            Line((288, -28.5), (288, -27))
        make_face()
        with BuildLine():
            ThreePointArc((262, -27), (257, -32), (252, -27))
            Line((252, -27), (252, -28.5))
            ThreePointArc((252, -28.5), (257, -33.5), (262, -28.5))
            Line((262, -28.5), (262, -27))
        make_face()
        with BuildLine():
            ThreePointArc((262, -63), (257, -68), (252, -63))
            Line((252, -63), (252, -64.5))
            ThreePointArc((252, -64.5), (257, -69.5), (262, -64.5))
            Line((262, -64.5), (262, -63))
        make_face()
        with BuildLine():
            ThreePointArc((288, -63), (283, -68), (278, -63))
            Line((278, -63), (278, -64.5))
            ThreePointArc((278, -64.5), (283, -69.5), (288, -64.5))
            Line((288, -64.5), (288, -63))
        make_face()
    boss_extrude2 = extrude(amount=-BOSS_EXTRUDE2_DEPTH)

    # Mirror1: Boss-Extrude1, Boss-Extrude2 across plane
    add(boss_extrude1.mirror(Plane.XY))
    add(boss_extrude2.mirror(Plane.XY))

    # Sketch4 → Cut-Extrude2 (cut)
    with BuildSketch(Plane.ZY.offset(10)):
        with BuildLine():
            Line((-252, -27), (-252, -33))
            ThreePointArc((-252, -33), (-257, -38), (-262, -33))
            Line((-262, -33), (-262, -27))
            ThreePointArc((-262, -27), (-257, -22), (-252, -27))
        make_face()
        with BuildLine():
            Line((-279.464466094, -30.535533906), (-285.464466094, -36.535533906))
            ThreePointArc((-285.464466094, -36.535533906), (-292.535533906, -36.535533906), (-292.535533906, -29.464466094))
            Line((-292.535533906, -29.464466094), (-286.535533906, -23.464466094))
            ThreePointArc((-286.535533906, -23.464466094), (-279.464466094, -23.464466094), (-279.464466094, -30.535533906))
        make_face()
        with BuildLine():
            Line((-283, -68), (-289, -68))
            ThreePointArc((-289, -68), (-294, -63), (-289, -58))
            Line((-289, -58), (-283, -58))
            ThreePointArc((-283, -58), (-278, -63), (-283, -68))
        make_face()
    cut_extrude2 = extrude(amount=-CUT_EXTRUDE2_DEPTH, mode=Mode.SUBTRACT)

    # Sketch5 → Cut-Extrude3 (cut, through all)
    with BuildSketch(Plane.ZY.offset(10)):
        with BuildLine():
            Line((-280.949390335, -29.050609665), (-286.949390335, -35.050609665))
            ThreePointArc((-286.949390335, -35.050609665), (-291.050609665, -35.050609665), (-291.050609665, -30.949390335))
            Line((-291.050609665, -30.949390335), (-285.050609665, -24.949390335))
            ThreePointArc((-285.050609665, -24.949390335), (-280.949390335, -24.949390335), (-280.949390335, -29.050609665))
        make_face()
        with BuildLine():
            Line((-254.1, -27), (-254.1, -33))
            ThreePointArc((-254.1, -33), (-257, -35.9), (-259.9, -33))
            Line((-259.9, -33), (-259.9, -27))
            ThreePointArc((-259.9, -27), (-257, -24.1), (-254.1, -27))
        make_face()
        with BuildLine():
            Line((-283, -65.9), (-289, -65.9))
            ThreePointArc((-289, -65.9), (-291.9, -63), (-289, -60.1))
            Line((-289, -60.1), (-283, -60.1))
            ThreePointArc((-283, -60.1), (-280.1, -63), (-283, -65.9))
        make_face()
    cut_extrude3 = extrude(amount=-CUT_EXTRUDE3_DEPTH, mode=Mode.SUBTRACT)

    # Mirror2: Cut-Extrude2, Cut-Extrude3 across plane
    add(cut_extrude2.mirror(Plane.XY), mode=Mode.SUBTRACT)
    add(cut_extrude3.mirror(Plane.XY), mode=Mode.SUBTRACT)

    # Sketch6 → Cut-Extrude4 (cut, through all)
    with BuildSketch(Plane(origin=(10, 0, 0), x_dir=(0, 0, -1), z_dir=(1, 0, 0))):
        with Locations(Location((-190, -60, 0), (0, 0, 90))):
            Circle(SKETCH6_R)
        with Locations(Location((190, -60, 0), (0, 0, 90))):
            Circle(SKETCH6_R)
    extrude(amount=-CUT_EXTRUDE4_DEPTH, mode=Mode.SUBTRACT)


solid = part_1.part
